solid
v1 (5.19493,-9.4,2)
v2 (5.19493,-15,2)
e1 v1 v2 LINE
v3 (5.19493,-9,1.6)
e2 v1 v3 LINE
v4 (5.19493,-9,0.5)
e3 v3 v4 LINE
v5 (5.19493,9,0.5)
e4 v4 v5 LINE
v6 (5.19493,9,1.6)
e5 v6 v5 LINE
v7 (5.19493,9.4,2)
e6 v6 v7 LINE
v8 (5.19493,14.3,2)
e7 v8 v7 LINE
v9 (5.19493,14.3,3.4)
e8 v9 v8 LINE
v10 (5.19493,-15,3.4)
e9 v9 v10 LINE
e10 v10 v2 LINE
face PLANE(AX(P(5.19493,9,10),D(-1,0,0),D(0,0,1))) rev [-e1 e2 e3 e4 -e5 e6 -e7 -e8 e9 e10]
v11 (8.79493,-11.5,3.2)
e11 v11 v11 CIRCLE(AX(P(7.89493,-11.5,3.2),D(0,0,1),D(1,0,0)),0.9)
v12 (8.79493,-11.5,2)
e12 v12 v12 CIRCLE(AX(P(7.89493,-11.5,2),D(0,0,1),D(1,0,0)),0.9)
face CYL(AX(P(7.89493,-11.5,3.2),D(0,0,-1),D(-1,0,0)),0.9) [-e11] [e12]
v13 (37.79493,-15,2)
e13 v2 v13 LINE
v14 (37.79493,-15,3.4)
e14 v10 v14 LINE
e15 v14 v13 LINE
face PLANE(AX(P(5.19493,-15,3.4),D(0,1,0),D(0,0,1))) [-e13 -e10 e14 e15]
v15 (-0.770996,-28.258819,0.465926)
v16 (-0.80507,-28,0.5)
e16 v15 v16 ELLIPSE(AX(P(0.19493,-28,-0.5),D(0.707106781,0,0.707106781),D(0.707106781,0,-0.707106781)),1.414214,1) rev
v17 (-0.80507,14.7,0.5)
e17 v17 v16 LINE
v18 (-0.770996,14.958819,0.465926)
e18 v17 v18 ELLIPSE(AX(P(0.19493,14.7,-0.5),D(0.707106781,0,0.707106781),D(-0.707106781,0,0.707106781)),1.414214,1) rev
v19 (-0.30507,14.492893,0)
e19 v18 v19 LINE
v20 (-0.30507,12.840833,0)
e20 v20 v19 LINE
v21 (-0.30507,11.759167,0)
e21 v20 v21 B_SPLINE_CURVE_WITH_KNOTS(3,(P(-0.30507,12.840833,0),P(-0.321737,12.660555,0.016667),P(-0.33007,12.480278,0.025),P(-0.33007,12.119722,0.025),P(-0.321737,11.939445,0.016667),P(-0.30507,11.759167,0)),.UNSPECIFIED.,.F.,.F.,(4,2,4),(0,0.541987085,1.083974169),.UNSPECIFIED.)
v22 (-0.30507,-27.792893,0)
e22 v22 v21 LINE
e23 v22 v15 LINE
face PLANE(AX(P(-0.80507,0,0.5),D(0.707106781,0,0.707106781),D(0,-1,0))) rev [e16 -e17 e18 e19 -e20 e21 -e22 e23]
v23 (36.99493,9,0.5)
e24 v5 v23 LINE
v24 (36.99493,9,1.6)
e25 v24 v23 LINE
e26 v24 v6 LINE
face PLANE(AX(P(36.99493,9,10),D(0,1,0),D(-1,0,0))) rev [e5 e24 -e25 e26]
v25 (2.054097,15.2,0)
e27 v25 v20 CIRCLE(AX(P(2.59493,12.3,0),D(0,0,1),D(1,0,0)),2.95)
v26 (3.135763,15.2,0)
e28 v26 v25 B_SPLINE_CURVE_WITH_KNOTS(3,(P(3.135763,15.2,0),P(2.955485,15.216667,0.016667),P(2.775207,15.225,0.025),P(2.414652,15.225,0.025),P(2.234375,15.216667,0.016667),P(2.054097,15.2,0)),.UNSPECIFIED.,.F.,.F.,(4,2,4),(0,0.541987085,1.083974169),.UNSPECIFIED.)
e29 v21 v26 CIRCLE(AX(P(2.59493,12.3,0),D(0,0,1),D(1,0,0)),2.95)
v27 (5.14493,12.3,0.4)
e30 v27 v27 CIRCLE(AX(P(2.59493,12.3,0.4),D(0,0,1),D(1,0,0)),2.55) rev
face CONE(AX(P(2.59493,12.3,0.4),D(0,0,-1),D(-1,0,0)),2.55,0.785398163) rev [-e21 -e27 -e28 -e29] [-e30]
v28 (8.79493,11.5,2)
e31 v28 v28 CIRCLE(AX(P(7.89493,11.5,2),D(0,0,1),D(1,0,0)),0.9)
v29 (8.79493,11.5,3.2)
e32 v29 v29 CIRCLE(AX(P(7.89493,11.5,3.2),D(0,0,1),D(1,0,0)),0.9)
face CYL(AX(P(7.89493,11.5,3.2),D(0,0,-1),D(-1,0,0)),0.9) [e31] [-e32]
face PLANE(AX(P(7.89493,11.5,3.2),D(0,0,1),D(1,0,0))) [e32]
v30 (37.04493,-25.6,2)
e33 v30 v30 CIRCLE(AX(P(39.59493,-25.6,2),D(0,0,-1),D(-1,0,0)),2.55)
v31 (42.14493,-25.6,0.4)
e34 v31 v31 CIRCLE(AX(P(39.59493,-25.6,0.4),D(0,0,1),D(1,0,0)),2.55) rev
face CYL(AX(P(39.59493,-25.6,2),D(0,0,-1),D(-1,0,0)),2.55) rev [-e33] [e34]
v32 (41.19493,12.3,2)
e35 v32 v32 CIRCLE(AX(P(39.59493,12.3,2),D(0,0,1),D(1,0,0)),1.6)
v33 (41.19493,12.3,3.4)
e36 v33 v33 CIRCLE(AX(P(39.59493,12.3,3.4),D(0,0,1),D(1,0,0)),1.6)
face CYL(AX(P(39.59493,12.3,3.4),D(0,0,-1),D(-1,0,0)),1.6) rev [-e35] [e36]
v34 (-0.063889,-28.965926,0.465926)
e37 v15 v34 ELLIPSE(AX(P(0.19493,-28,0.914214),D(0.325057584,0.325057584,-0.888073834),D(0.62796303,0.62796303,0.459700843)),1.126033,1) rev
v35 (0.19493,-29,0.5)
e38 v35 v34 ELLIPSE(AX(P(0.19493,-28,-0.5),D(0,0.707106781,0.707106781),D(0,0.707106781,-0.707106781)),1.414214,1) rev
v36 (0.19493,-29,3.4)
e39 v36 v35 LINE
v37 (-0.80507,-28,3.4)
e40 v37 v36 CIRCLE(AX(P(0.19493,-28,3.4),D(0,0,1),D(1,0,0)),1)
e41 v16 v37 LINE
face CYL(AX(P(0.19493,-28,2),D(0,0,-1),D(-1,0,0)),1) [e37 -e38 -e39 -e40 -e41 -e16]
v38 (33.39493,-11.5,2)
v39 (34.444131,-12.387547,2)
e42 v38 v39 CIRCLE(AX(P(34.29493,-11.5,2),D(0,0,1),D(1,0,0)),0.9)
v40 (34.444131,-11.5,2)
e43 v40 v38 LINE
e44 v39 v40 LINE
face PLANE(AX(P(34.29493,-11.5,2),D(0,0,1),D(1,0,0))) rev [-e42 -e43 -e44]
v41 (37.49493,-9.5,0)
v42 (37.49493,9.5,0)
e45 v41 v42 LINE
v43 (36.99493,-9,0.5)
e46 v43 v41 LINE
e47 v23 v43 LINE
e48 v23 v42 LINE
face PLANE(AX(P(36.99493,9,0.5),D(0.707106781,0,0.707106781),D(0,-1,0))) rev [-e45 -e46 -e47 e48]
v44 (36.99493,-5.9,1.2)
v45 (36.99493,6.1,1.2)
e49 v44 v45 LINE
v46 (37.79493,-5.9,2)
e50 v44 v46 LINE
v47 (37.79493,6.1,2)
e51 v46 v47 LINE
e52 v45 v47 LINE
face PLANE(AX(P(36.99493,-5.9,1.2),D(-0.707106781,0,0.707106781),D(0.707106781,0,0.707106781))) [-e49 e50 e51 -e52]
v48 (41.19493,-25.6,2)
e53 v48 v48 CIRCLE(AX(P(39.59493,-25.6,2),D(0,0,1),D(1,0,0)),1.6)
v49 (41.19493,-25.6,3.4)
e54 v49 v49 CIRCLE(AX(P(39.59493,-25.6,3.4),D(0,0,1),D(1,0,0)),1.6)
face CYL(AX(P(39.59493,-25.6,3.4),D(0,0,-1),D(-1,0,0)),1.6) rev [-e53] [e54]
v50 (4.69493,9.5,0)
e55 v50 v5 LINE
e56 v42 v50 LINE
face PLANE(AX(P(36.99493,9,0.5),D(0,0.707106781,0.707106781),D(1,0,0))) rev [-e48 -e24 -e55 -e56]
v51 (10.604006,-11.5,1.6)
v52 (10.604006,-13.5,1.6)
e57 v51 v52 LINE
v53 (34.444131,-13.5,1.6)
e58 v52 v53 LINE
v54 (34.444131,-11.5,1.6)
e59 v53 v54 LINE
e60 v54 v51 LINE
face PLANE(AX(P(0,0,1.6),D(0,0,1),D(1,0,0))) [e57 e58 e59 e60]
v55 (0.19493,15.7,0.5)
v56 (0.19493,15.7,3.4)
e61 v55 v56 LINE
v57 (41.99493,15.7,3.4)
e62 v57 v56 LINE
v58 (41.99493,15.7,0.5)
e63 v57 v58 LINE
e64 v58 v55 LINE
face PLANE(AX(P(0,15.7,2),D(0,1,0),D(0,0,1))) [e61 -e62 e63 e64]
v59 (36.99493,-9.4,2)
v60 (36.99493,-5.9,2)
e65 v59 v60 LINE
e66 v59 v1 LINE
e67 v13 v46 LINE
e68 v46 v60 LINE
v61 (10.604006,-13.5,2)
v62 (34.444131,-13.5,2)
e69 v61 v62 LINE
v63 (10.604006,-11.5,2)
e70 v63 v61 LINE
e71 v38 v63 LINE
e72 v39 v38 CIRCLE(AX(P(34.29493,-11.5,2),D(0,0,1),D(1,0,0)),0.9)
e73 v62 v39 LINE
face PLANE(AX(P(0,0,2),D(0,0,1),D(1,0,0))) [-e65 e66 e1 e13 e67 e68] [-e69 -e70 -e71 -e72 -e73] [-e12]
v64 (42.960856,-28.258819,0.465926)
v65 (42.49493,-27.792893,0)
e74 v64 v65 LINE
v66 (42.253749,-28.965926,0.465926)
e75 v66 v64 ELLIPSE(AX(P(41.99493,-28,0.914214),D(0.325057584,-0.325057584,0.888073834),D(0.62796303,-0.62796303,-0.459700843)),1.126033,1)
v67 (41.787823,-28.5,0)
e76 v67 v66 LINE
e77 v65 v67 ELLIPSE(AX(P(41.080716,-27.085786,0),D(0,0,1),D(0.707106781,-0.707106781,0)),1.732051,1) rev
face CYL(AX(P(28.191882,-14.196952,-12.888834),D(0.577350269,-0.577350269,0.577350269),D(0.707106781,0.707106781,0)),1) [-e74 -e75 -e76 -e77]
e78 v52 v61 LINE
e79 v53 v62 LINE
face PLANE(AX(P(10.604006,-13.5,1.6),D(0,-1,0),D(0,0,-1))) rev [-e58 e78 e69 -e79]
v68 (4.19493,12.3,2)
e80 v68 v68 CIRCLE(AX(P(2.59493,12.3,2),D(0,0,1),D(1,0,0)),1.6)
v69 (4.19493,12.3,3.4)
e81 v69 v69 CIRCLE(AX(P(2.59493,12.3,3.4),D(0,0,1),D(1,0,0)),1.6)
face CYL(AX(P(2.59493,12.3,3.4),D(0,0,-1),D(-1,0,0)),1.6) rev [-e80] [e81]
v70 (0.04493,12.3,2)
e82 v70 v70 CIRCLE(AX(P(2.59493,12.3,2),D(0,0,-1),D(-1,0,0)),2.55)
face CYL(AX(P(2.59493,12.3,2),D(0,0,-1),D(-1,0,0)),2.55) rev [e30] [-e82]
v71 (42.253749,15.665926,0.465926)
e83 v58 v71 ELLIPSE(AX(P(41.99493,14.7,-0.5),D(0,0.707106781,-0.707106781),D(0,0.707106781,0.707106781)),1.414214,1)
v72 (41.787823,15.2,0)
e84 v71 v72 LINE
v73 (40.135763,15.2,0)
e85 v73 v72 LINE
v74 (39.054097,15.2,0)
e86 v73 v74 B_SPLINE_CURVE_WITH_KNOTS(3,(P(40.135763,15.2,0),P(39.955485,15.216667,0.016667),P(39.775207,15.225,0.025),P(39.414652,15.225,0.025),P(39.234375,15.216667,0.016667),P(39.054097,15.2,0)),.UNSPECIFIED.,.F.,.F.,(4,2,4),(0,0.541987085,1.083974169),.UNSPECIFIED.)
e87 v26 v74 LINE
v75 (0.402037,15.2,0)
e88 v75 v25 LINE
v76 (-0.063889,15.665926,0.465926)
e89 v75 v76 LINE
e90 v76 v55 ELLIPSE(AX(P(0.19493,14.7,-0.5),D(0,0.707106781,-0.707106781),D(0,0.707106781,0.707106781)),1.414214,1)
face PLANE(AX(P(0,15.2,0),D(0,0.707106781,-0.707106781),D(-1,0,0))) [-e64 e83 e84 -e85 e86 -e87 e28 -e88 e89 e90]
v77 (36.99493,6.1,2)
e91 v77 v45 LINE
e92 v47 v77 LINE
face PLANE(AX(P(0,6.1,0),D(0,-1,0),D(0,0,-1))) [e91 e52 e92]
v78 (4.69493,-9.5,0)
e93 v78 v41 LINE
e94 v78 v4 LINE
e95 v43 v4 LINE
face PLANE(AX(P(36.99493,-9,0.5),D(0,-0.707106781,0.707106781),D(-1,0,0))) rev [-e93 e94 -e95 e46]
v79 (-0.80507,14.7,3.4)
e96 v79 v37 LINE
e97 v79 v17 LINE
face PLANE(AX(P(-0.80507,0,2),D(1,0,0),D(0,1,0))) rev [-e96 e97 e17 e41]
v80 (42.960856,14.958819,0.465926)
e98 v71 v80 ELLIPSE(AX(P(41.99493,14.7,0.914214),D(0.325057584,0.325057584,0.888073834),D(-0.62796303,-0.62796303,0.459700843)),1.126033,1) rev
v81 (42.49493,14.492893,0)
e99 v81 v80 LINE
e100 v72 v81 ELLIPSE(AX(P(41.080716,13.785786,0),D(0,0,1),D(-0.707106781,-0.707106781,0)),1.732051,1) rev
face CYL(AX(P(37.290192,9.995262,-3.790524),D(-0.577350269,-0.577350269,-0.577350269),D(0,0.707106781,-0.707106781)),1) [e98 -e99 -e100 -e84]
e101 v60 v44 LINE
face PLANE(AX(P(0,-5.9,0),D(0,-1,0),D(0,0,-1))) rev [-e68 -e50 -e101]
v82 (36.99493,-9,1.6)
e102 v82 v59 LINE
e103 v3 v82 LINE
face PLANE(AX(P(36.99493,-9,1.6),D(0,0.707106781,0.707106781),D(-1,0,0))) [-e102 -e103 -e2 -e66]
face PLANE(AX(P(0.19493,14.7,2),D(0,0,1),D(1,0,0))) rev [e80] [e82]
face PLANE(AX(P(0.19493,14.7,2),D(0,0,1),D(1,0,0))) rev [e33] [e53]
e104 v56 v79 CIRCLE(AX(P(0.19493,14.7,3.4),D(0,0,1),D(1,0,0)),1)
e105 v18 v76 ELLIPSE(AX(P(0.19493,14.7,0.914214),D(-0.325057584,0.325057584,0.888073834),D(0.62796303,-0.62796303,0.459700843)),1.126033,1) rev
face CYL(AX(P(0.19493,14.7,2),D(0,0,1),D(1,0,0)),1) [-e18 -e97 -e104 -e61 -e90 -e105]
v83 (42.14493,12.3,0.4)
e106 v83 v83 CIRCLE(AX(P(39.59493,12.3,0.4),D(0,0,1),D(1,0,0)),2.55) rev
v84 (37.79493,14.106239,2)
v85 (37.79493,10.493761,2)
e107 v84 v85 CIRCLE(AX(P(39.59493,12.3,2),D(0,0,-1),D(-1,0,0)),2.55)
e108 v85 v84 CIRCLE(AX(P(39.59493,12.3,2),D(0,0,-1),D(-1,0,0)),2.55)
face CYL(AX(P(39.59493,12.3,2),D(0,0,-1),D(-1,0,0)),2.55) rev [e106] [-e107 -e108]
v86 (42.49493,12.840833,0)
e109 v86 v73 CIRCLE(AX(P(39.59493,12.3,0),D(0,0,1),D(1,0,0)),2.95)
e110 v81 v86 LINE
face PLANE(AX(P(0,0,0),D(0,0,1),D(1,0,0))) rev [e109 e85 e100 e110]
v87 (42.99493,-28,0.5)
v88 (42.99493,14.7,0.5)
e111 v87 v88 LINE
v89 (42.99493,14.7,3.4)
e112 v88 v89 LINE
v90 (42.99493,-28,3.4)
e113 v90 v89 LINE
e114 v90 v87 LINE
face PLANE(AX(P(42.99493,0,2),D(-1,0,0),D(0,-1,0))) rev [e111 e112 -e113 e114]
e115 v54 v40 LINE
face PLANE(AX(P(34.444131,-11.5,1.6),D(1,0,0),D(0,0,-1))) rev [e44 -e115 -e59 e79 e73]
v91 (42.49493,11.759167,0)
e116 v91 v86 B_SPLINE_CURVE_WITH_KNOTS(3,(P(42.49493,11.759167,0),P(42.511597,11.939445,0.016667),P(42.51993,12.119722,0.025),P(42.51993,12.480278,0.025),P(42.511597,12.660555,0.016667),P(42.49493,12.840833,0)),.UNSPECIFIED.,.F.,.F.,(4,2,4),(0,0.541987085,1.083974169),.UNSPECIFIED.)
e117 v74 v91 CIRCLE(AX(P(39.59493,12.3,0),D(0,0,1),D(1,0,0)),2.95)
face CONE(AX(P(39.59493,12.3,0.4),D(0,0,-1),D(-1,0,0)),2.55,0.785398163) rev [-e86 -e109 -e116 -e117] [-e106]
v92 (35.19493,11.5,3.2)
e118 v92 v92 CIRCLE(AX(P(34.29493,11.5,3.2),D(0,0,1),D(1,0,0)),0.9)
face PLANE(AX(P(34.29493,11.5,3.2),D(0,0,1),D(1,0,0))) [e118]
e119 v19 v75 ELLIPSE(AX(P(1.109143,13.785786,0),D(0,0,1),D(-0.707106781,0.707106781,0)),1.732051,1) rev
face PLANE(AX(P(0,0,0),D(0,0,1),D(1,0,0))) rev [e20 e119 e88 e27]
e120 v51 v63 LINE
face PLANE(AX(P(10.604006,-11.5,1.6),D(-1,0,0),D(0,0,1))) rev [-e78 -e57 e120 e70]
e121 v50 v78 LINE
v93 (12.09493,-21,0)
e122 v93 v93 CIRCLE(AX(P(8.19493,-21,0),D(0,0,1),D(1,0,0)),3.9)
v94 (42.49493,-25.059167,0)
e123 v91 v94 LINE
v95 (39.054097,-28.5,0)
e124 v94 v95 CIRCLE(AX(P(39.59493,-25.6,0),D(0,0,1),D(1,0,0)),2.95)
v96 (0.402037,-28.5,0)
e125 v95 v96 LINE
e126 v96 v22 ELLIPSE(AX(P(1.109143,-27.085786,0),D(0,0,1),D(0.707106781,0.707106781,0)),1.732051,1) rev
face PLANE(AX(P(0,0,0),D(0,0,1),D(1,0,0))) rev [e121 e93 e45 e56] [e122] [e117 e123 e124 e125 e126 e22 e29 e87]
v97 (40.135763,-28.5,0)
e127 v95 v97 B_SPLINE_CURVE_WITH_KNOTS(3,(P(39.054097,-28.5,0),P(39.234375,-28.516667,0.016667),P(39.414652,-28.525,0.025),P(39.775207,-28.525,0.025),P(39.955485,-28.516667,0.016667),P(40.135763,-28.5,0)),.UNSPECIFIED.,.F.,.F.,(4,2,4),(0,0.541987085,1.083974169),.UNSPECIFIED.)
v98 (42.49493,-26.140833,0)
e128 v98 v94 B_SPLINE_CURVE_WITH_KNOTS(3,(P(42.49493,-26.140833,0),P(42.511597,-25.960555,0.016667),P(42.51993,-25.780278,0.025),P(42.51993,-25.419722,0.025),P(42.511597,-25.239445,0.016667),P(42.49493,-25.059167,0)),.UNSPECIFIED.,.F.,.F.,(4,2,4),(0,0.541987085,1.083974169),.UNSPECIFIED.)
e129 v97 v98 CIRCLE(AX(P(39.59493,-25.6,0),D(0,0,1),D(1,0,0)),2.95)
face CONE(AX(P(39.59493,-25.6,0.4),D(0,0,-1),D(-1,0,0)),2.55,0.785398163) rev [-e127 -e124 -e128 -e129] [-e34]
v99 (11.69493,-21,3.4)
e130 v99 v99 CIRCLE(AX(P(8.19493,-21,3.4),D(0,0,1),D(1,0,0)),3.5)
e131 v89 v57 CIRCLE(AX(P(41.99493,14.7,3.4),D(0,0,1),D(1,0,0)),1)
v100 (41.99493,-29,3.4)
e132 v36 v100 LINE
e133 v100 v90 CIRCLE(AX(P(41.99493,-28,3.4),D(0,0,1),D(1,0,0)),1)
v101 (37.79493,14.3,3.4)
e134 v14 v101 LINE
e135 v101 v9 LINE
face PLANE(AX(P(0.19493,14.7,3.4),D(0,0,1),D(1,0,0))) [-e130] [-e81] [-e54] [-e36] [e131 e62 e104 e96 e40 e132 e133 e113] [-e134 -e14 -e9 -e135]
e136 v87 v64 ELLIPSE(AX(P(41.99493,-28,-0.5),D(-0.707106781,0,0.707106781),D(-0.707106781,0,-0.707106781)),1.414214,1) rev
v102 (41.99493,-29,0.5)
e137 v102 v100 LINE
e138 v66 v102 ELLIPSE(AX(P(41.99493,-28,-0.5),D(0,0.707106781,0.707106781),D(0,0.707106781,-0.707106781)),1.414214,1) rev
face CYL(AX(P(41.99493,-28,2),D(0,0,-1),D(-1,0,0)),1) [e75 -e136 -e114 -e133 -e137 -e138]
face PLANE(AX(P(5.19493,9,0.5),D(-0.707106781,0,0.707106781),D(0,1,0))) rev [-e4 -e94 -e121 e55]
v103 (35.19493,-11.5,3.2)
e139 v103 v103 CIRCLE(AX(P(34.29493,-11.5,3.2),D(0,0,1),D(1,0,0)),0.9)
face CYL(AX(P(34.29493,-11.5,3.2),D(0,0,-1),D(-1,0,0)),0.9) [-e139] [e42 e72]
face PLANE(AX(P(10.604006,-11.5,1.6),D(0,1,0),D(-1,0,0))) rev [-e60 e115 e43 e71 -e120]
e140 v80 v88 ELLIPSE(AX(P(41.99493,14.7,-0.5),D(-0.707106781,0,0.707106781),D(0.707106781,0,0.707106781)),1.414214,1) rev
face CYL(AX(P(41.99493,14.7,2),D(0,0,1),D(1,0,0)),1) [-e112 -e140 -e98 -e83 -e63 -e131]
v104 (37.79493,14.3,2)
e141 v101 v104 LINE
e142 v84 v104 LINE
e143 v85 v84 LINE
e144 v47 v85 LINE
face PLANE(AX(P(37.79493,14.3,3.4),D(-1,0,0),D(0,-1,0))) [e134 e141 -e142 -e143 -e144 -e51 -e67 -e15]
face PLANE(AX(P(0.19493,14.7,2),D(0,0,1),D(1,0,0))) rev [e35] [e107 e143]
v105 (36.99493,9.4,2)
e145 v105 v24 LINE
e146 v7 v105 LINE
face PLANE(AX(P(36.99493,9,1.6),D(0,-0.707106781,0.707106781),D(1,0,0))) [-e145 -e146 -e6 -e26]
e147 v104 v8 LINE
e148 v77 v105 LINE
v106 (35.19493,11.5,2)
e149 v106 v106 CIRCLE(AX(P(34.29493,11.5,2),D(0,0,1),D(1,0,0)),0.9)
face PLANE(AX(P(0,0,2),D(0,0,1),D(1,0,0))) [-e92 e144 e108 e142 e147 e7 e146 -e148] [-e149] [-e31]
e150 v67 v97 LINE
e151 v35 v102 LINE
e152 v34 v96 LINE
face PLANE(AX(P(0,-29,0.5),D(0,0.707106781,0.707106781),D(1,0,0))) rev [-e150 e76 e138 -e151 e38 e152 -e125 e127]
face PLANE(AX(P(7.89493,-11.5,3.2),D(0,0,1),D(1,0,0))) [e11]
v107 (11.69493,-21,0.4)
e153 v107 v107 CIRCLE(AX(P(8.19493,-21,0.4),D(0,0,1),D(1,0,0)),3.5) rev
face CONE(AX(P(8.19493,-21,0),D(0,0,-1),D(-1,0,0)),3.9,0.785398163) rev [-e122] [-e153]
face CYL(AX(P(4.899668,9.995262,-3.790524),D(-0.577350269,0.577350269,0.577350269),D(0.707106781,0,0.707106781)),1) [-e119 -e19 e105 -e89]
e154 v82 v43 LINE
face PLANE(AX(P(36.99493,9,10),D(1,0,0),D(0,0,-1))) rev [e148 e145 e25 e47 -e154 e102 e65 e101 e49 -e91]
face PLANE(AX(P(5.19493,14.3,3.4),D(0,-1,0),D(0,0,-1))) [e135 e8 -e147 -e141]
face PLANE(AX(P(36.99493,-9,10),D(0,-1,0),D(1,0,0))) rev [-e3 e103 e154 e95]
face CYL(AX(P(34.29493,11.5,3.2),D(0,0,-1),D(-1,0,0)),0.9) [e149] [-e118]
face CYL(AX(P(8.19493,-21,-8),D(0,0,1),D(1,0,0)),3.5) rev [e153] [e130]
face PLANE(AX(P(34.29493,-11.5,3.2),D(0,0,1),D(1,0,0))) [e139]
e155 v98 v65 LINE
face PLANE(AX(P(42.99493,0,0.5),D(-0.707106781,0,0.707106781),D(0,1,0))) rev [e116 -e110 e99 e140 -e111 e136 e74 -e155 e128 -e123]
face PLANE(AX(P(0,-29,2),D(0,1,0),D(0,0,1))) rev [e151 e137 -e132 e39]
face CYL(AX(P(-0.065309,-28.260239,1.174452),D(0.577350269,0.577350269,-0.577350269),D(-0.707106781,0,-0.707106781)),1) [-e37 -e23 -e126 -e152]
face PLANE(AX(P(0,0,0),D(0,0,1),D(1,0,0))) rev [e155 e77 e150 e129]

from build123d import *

# Parameters (mm, degrees)
EXTRUDE_1_DEPTH          = 2
SKETCH_17_W              = 31.8
SKETCH_17_H              = 18
CUT_EXTRUDE_1_DEPTH      = 10
CHAMFER_1_SIZE           = 0.5
CHAMFER_3_SIZE           = 0.5
SKETCH_25_W              = 23.840125732
SKETCH_25_H              = 2
CUT_EXTRUDE_5_DEPTH      = 0.4
CUT_EXTRUDE_6_DEPTH      = 6
CUT_EXTRUDE_6_DEPTH_BACK = 6
SKETCH_28_R              = 0.9
EXTRUDE_3_DEPTH          = 1.2
CHAMFER_6_SIZE           = 0.4
SKETCH_29_R              = 1.6
CUT_EXTRUDE_7_DEPTH      = 3.2
SKETCH_30_R              = 3.5
CUT_EXTRUDE_8_DEPTH      = 10
CHAMFER_9_SIZE           = 0.4
FILLET_1_R               = 1
SKETCH_31_R              = 2.55
CUT_EXTRUDE_9_DEPTH      = 2
CHAMFER_10_SIZE          = 0.4
SKETCH_32_R              = 3.5
SKETCH_32_R_2            = 1.6
SKETCH_32_W              = 32.6
SKETCH_32_H              = 29.3
EXTRUDE_5_DEPTH          = 1.4


with BuildPart() as part:
    # Эскиз1 → Бобышка-Вытянуть1 (new body)
    with BuildSketch(Plane.XY):
        Polygon((42.994929839, 15.7), (0.265604814, 15.7), (-0.805070161, 15.7), (-0.805070161, -3.225667373), (-0.805070161, -27.24226554), (-0.805070161, -29), (41.213218599, -29), (42.994929839, -29), (42.994929839, 0), align=None)
    extrude(amount=EXTRUDE_1_DEPTH)

    # Эскиз17 → Вырез-Вытянуть1 (cut)
    with BuildSketch(Plane(origin=(0, 0, 0), x_dir=(-1, 0, 0), z_dir=(0, 0, -1))):
        with Locations((-21.094929839, 0)):
            Rectangle(SKETCH_17_W, SKETCH_17_H)
    extrude(amount=-CUT_EXTRUDE_1_DEPTH, mode=Mode.SUBTRACT)

    # Фаска1
    chamfer_1_edges = [part.edges().sort_by_distance(p)[0] for p in [
        (36.994929839, 0, 0),
        (21.094929839, -9, 0),
        (5.194929839, 0, 0),
        (21.094929839, 9, 0),
    ]]
    chamfer(chamfer_1_edges, length=CHAMFER_1_SIZE)

    # Фаска3
    chamfer_3_edges = [part.edges().sort_by_distance(p)[0] for p in [
        (21.094929839, 15.7, 0),
        (42.994929839, -6.65, 0),
        (21.094929839, -29, 0),
        (-0.805070161, -6.65, 0),
    ]]
    chamfer(chamfer_3_edges, length=CHAMFER_3_SIZE)

    # Эскиз25 → Вырез-Вытянуть5 (cut)
    with BuildSketch(Plane.XY.offset(2)):
        with Locations((22.524068439, -12.5)):
            Rectangle(SKETCH_25_W, SKETCH_25_H)
    extrude(amount=-CUT_EXTRUDE_5_DEPTH, mode=Mode.SUBTRACT)

    # Эскиз27 → Вырез-Вытянуть6 (cut, two sides: drawn at the far end of the back side and taken through both)
    with BuildSketch(Plane(origin=(0, 0.1, 0), x_dir=(-1, 0, 0), z_dir=(0, -1, 0)).offset(-CUT_EXTRUDE_6_DEPTH_BACK)):
        Polygon((-36.994929839, -2), (-36.994929839, -1.2), (-37.794929839, -2), align=None)
    extrude(amount=CUT_EXTRUDE_6_DEPTH + CUT_EXTRUDE_6_DEPTH_BACK, mode=Mode.SUBTRACT)

    # Эскиз28 → Бобышка-Вытянуть3 (add)
    with BuildSketch(Plane.XY.offset(2)):
        with Locations((7.894929839, 11.5)):
            Circle(SKETCH_28_R)
        with Locations((34.294929839, 11.5)):
            Circle(SKETCH_28_R)
        with Locations(Location((34.294929839, -11.5, 0), (0, 0, 180))):
            Circle(SKETCH_28_R)
        with Locations((7.894929839, -11.5)):
            Circle(SKETCH_28_R)
    extrude(amount=EXTRUDE_3_DEPTH)

    # Фаска6
    chamfer_6_edges = [part.edges().sort_by_distance(p)[0] for p in [
        (21.094929839, 9, 2),
        (21.094929839, -9, 2),
    ]]
    chamfer(chamfer_6_edges, length=CHAMFER_6_SIZE)

    # Эскиз29 → Вырез-Вытянуть7 (cut)
    with BuildSketch(Plane.XY.offset(2)):
        with Locations((2.594929839, 12.3)):
            Circle(SKETCH_29_R)
        with Locations((39.594929839, 12.3)):
            Circle(SKETCH_29_R)
        with Locations((39.594929839, -25.6)):
            Circle(SKETCH_29_R)
    extrude(amount=-CUT_EXTRUDE_7_DEPTH, mode=Mode.SUBTRACT)

    # Эскиз30 → Вырез-Вытянуть8 (cut)
    with BuildSketch(Plane.XY.offset(2)):
        with Locations((8.194929839, -21)):
            Circle(SKETCH_30_R)
    extrude(amount=-CUT_EXTRUDE_8_DEPTH, mode=Mode.SUBTRACT)

    # Фаска9
    chamfer_9_edges = [part.edges().sort_by_distance(p)[0] for p in [
        (4.694929839, -21, 0),
    ]]
    chamfer(chamfer_9_edges, length=CHAMFER_9_SIZE)

    # Скругление1
    # the kernel refuses this fillet: 1 mm, written as the material it takes off along each edge
    with BuildSketch(Plane(origin=(42.994929839, -29, -2), x_dir=(0, 1, 0), z_dir=(0, 0, 1)), Plane(origin=(42.994929839, 15.7, -2), x_dir=(-1, 0, 0), z_dir=(0, 0, 1))) as fillet_1_piece_1:
        with BuildLine():
            CenterArc((FILLET_1_R, FILLET_1_R), FILLET_1_R, 180, 90)
            Line((0, FILLET_1_R), (0, 0))
            Line((0, 0), (FILLET_1_R, 0))
        make_face()
    extrude(amount=6.5, mode=Mode.SUBTRACT)
    with BuildSketch(Plane(origin=(-0.805070161, -29, -2), x_dir=(0, 1, 0), z_dir=(0, 0, 1)), Plane(origin=(-0.805070161, 15.7, -2), x_dir=(1, 0, 0), z_dir=(0, 0, 1))) as fillet_1_piece_2:
        with BuildLine():
            CenterArc((FILLET_1_R, -FILLET_1_R), FILLET_1_R, 90, 90)
            Line((0, -FILLET_1_R), (0, 0))
            Line((0, 0), (FILLET_1_R, 0))
        make_face()
    extrude(amount=6.5, mode=Mode.SUBTRACT)
    with BuildSketch(Plane(origin=(0.528263172, 14.366666667, -0.833333333), x_dir=(0.816496580927726, 0.4082482904638629, 0.4082482904638631), z_dir=(-0.5773502691896258, 0.5773502691896258, 0.5773502691896258)), Plane(origin=(0.528263172, -27.666666667, -0.833333333), x_dir=(-0.4082482904638631, 0.8164965809277261, 0.4082482904638631), z_dir=(-0.5773502691896258, -0.5773502691896258, 0.5773502691896258))) as fillet_1_piece_3:
        with BuildLine():
            CenterArc((FILLET_1_R * 0.57735026919, -FILLET_1_R), FILLET_1_R, 90, 60)
            Line((-FILLET_1_R * 0.288675134595, -FILLET_1_R * 0.5), (0, 0))
            Line((0, 0), (FILLET_1_R * 0.57735026919, 0))
        make_face()
    extrude(amount=3.75277675, mode=Mode.SUBTRACT)
    with BuildSketch(Plane(origin=(41.661596505, 14.366666667, -0.833333333), x_dir=(-0.8164965809277261, 0.4082482904638622, 0.4082482904638635), z_dir=(0.5773502691896256, 0.577350269189626, 0.577350269189626)), Plane(origin=(41.661596505, -27.666666667, -0.833333333), x_dir=(0.4082482904638636, 0.8164965809277261, 0.40824829046386224), z_dir=(0.5773502691896261, -0.5773502691896256, 0.5773502691896256))) as fillet_1_piece_4:
        with BuildLine():
            CenterArc((FILLET_1_R * 0.57735026919, FILLET_1_R), FILLET_1_R, 210, 60)
            Line((-FILLET_1_R * 0.288675134595, FILLET_1_R * 0.5), (0, 0))
            Line((0, 0), (FILLET_1_R * 0.57735026919, 0))
        make_face()
    extrude(amount=3.75277675, mode=Mode.SUBTRACT)

    # Эскиз31 → Вырез-Вытянуть9 (cut)
    with BuildSketch(Plane(origin=(0, 0, 0), x_dir=(-1, 0, 0), z_dir=(0, 0, -1))):
        with Locations((-39.594929839, 12.3)):
            Circle(SKETCH_31_R)
        with Locations((-2.594929839, 12.3)):
            Circle(SKETCH_31_R)
        with Locations((-39.594929839, -25.6)):
            Circle(SKETCH_31_R)
    extrude(amount=-CUT_EXTRUDE_9_DEPTH, mode=Mode.SUBTRACT)

    # Фаска10
    # the kernel refuses this chamfer: 0.4 mm, written as the material it takes off along each edge
    with BuildSketch(Plane(origin=(39.594929839, -25.6, 0), x_dir=(-1, 0, 0), z_dir=(0, -1, 0))) as chamfer_10_piece_1:
        Polygon((2.55 + CHAMFER_10_SIZE, 0), (2.55, -CHAMFER_10_SIZE), (2.55, 0), align=None)
    revolve(axis=Axis((39.594929839, -25.6, 0), (0, 0, -1)), mode=Mode.SUBTRACT)
    with BuildSketch(Plane(origin=(2.594929839, 12.3, 0), x_dir=(-1, 0, 0), z_dir=(0, -1, 0))) as chamfer_10_piece_2:
        Polygon((2.55 + CHAMFER_10_SIZE, 0), (2.55, -CHAMFER_10_SIZE), (2.55, 0), align=None)
    revolve(axis=Axis((2.594929839, 12.3, 0), (0, 0, -1)), mode=Mode.SUBTRACT)
    with BuildSketch(Plane(origin=(39.594929839, 12.3, 0), x_dir=(-1, 0, 0), z_dir=(0, -1, 0))) as chamfer_10_piece_3:
        Polygon((2.55 + CHAMFER_10_SIZE, 0), (2.55, -CHAMFER_10_SIZE), (2.55, 0), align=None)
    revolve(axis=Axis((39.594929839, 12.3, 0), (0, 0, -1)), mode=Mode.SUBTRACT)

    # Эскиз32 → Бобышка-Вытянуть5 (add)
    with BuildSketch(Plane.XY.offset(2)):
        with BuildLine():
            Line((-0.805070161, 14.7), (-0.805070161, -28))
            ThreePointArc((-0.805070161, -28), (-0.512176942, -28.707106781), (0.194929839, -29))
            Line((0.194929839, -29), (41.994929839, -29))
            ThreePointArc((41.994929839, -29), (42.70203662, -28.707106781), (42.994929839, -28))
            Line((42.994929839, -28), (42.994929839, 14.7))
            ThreePointArc((42.994929839, 14.7), (42.70203662, 15.407106781), (41.994929839, 15.7))
            Line((41.994929839, 15.7), (0.194929839, 15.7))
            ThreePointArc((0.194929839, 15.7), (-0.512176942, 15.407106781), (-0.805070161, 14.7))
        make_face()
        with Locations((8.194929839, -21)):
            Circle(SKETCH_32_R, mode=Mode.SUBTRACT)
        with Locations((39.594929839, -25.6)):
            Circle(SKETCH_32_R_2, mode=Mode.SUBTRACT)
        with Locations((39.594929839, 12.3)):
            Circle(SKETCH_32_R_2, mode=Mode.SUBTRACT)
        with Locations((2.594929839, 12.3)):
            Circle(SKETCH_32_R_2, mode=Mode.SUBTRACT)
        with Locations((21.494929839, -0.35)):
            Rectangle(SKETCH_32_W, SKETCH_32_H, mode=Mode.SUBTRACT)
    extrude(amount=EXTRUDE_5_DEPTH)


solid = part.part
